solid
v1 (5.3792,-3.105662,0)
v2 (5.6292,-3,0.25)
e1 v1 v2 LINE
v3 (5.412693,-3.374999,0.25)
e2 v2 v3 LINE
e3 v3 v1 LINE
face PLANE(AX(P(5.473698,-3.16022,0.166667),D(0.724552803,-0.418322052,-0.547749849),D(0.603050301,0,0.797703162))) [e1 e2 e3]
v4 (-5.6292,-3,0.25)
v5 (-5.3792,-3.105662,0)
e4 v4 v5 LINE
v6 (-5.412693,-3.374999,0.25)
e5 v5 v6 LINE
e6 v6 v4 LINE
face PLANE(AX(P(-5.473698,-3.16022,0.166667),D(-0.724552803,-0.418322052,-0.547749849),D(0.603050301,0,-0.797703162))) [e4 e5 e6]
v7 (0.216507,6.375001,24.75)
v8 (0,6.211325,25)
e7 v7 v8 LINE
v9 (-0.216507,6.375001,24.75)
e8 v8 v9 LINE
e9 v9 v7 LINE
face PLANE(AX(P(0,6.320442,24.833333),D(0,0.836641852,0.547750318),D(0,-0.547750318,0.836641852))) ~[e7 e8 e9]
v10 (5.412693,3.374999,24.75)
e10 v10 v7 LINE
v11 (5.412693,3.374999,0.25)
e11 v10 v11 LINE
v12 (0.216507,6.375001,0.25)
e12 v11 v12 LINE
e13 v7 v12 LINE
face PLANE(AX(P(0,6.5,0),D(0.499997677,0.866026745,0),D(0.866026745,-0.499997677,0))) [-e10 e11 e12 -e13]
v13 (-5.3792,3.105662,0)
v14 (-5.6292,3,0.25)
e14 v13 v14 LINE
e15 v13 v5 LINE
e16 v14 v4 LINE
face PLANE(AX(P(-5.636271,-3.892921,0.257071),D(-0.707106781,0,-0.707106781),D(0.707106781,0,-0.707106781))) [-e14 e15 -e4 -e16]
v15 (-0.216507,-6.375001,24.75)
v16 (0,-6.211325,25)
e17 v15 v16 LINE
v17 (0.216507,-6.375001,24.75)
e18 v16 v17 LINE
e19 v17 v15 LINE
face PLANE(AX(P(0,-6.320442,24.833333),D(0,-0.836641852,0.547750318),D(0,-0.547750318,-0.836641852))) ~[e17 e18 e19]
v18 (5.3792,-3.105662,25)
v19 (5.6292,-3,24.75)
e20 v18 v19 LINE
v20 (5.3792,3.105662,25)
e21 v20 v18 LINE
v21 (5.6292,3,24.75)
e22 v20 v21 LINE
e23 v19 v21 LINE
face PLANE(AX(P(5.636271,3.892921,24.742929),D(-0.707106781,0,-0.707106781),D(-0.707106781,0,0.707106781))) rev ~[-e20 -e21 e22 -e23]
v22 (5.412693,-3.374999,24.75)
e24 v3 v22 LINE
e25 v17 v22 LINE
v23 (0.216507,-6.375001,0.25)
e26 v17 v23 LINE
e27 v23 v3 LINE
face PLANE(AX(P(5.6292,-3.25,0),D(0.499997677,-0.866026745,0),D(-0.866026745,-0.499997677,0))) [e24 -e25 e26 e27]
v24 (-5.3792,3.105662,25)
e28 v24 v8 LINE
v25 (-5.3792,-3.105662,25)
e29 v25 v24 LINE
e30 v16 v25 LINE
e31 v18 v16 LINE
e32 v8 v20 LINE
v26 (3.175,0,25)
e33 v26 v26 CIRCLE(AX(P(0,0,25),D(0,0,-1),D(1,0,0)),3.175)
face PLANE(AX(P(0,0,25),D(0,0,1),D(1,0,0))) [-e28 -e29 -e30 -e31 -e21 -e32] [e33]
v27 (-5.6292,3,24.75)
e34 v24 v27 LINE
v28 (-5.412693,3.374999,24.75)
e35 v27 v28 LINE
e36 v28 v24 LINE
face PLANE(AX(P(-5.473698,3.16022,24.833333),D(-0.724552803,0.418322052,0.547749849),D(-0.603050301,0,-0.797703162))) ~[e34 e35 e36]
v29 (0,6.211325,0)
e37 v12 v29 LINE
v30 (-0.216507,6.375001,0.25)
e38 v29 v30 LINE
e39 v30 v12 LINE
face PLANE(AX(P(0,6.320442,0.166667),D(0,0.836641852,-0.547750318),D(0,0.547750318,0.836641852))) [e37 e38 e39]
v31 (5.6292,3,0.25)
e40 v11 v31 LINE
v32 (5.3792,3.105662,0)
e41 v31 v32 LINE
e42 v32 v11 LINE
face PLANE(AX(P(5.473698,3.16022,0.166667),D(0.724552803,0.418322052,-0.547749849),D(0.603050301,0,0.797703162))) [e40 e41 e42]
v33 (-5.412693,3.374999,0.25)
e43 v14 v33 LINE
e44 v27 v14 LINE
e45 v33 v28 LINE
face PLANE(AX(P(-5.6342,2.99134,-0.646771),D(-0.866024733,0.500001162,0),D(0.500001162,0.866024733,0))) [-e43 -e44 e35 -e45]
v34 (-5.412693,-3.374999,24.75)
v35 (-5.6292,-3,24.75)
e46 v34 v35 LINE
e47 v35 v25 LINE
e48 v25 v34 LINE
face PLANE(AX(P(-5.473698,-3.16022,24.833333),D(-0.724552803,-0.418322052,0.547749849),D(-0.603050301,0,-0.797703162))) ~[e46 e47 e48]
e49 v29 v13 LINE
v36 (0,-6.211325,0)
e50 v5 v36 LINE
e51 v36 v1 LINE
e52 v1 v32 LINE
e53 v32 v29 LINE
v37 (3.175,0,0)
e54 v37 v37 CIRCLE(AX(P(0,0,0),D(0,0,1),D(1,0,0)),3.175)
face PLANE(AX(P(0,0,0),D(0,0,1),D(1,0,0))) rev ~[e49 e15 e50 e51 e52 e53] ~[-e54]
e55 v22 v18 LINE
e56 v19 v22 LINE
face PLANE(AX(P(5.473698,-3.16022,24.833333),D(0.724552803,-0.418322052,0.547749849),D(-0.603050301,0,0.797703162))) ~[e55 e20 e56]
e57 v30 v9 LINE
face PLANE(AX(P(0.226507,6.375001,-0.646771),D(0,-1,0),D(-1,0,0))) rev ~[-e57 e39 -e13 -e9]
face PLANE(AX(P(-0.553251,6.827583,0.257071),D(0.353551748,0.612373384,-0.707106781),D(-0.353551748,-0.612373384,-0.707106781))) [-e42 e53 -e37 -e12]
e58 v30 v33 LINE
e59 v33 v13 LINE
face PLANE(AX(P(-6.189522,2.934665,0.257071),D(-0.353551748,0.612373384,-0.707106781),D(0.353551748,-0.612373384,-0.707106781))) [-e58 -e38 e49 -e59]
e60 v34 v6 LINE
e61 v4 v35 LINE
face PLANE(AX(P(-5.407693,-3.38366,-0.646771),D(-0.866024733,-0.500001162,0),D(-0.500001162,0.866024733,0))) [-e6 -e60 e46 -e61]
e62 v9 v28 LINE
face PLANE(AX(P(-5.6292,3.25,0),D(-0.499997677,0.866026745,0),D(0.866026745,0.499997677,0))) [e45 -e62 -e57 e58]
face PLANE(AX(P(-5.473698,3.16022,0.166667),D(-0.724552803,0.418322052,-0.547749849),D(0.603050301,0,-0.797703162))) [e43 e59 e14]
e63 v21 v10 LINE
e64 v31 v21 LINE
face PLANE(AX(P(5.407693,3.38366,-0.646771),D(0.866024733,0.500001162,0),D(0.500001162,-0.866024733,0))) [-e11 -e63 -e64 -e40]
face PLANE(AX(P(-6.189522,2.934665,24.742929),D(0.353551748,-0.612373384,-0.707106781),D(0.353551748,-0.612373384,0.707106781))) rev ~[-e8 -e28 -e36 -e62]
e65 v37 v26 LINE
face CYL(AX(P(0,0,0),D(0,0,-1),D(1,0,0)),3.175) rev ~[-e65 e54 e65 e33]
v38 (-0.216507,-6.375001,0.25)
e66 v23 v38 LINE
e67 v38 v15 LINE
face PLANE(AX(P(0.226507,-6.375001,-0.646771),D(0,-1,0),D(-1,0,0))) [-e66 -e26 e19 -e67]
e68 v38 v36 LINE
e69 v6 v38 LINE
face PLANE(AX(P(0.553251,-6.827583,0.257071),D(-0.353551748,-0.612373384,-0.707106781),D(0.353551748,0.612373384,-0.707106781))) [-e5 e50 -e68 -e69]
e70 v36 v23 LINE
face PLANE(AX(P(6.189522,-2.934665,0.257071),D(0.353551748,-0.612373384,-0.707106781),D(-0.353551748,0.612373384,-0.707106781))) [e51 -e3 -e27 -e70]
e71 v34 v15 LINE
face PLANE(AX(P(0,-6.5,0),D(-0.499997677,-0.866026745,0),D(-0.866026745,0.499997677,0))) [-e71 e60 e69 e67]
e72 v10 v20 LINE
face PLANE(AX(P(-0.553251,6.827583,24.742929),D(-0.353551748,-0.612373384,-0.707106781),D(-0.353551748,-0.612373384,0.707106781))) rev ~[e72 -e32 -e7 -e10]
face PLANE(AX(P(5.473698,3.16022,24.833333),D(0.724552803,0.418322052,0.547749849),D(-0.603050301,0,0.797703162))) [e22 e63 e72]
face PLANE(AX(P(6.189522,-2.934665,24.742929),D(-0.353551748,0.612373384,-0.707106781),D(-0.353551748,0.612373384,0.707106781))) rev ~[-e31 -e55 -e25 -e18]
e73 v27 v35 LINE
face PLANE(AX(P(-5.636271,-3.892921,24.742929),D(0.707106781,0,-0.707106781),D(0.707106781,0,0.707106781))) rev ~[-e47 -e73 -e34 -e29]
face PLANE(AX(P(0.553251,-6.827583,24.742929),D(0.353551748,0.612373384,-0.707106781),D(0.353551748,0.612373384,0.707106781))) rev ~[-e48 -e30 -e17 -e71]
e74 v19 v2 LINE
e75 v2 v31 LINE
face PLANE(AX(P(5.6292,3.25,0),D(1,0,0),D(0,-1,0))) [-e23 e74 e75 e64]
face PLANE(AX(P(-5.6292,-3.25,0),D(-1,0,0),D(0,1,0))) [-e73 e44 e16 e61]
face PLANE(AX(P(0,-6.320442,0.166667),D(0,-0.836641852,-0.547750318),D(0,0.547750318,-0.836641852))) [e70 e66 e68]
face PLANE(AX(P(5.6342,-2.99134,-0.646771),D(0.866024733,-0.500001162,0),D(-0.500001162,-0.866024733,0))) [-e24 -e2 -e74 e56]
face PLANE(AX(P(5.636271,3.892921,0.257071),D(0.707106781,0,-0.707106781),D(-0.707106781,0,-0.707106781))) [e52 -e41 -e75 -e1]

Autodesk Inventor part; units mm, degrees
ref_plane "YZ Plane" through (0, 0, 0) normal (1, 0, 0) x (0, 1, 0)
ref_plane "XZ Plane" through (0, 0, 0) normal (0, 1, 0) x (-1, 0, 0)
ref_plane "XY Plane" through (0, 0, 0) normal (0, 0, 1) x (1, 0, 0)
sketch "Sketch1" plane through (0, 0, 0) normal (0, 0, 1) x (1, 0, 0)
  line L0 (0, 0) -> (0, 6.5)
  line L1 (0, 6.5) -> (5.6292, 3.25)
  line L2 (0, 6.5) -> (6.5, 6.5) construction
  line L3 (5.6292, 3.25) -> (5.6292, -3.25)
  line L4 (5.6292, -3.25) -> (0, -6.5)
  line L5 (0, -6.5) -> (-5.6292, -3.25)
  line L6 (-5.6292, -3.25) -> (-5.6292, 3.25)
  line L7 (-5.6292, 3.25) -> (0, 6.5)
  circle A0 centre (0, 0) radius 3.175
  dimension "d1" = 6.5
  dimension "d2" = 30
  dimension "d3" = 6.35
extrude "Extrusion1" add sketch "Sketch1" along normal blind 25
chamfer "Chamfer1" distance 0.25 angle 45 18 edges at (2.8146, 4.875, 25) (5.6292, 0, 25) (2.8146, -4.875, 25) (-2.8146, -4.875, 25) (-5.6292, 0, 25) (-2.8146, 4.875, 25) (0, 6.5, 12.5) (5.6292, 3.25, 12.5) (5.6292, -3.25, 12.5) (0, -6.5, 12.5) (-5.6292, -3.25, 12.5) (-5.6292, 3.25, 12.5) (-2.8146, 4.875, 0) (-5.6292, 0, 0) (-2.8146, -4.875, 0) (2.8146, -4.875, 0) (5.6292, 0, 0) (2.8146, 4.875, 0)
thread "Thread1" size "1/4-20 UNC" class "2B" standard "ANSI Unified Screw Threads" full length
properties part number "5002_Brass_Nut_Tx_Rx_Relative_Positioning_MPSv2_v1" material "Brass, Soft Yellow"
